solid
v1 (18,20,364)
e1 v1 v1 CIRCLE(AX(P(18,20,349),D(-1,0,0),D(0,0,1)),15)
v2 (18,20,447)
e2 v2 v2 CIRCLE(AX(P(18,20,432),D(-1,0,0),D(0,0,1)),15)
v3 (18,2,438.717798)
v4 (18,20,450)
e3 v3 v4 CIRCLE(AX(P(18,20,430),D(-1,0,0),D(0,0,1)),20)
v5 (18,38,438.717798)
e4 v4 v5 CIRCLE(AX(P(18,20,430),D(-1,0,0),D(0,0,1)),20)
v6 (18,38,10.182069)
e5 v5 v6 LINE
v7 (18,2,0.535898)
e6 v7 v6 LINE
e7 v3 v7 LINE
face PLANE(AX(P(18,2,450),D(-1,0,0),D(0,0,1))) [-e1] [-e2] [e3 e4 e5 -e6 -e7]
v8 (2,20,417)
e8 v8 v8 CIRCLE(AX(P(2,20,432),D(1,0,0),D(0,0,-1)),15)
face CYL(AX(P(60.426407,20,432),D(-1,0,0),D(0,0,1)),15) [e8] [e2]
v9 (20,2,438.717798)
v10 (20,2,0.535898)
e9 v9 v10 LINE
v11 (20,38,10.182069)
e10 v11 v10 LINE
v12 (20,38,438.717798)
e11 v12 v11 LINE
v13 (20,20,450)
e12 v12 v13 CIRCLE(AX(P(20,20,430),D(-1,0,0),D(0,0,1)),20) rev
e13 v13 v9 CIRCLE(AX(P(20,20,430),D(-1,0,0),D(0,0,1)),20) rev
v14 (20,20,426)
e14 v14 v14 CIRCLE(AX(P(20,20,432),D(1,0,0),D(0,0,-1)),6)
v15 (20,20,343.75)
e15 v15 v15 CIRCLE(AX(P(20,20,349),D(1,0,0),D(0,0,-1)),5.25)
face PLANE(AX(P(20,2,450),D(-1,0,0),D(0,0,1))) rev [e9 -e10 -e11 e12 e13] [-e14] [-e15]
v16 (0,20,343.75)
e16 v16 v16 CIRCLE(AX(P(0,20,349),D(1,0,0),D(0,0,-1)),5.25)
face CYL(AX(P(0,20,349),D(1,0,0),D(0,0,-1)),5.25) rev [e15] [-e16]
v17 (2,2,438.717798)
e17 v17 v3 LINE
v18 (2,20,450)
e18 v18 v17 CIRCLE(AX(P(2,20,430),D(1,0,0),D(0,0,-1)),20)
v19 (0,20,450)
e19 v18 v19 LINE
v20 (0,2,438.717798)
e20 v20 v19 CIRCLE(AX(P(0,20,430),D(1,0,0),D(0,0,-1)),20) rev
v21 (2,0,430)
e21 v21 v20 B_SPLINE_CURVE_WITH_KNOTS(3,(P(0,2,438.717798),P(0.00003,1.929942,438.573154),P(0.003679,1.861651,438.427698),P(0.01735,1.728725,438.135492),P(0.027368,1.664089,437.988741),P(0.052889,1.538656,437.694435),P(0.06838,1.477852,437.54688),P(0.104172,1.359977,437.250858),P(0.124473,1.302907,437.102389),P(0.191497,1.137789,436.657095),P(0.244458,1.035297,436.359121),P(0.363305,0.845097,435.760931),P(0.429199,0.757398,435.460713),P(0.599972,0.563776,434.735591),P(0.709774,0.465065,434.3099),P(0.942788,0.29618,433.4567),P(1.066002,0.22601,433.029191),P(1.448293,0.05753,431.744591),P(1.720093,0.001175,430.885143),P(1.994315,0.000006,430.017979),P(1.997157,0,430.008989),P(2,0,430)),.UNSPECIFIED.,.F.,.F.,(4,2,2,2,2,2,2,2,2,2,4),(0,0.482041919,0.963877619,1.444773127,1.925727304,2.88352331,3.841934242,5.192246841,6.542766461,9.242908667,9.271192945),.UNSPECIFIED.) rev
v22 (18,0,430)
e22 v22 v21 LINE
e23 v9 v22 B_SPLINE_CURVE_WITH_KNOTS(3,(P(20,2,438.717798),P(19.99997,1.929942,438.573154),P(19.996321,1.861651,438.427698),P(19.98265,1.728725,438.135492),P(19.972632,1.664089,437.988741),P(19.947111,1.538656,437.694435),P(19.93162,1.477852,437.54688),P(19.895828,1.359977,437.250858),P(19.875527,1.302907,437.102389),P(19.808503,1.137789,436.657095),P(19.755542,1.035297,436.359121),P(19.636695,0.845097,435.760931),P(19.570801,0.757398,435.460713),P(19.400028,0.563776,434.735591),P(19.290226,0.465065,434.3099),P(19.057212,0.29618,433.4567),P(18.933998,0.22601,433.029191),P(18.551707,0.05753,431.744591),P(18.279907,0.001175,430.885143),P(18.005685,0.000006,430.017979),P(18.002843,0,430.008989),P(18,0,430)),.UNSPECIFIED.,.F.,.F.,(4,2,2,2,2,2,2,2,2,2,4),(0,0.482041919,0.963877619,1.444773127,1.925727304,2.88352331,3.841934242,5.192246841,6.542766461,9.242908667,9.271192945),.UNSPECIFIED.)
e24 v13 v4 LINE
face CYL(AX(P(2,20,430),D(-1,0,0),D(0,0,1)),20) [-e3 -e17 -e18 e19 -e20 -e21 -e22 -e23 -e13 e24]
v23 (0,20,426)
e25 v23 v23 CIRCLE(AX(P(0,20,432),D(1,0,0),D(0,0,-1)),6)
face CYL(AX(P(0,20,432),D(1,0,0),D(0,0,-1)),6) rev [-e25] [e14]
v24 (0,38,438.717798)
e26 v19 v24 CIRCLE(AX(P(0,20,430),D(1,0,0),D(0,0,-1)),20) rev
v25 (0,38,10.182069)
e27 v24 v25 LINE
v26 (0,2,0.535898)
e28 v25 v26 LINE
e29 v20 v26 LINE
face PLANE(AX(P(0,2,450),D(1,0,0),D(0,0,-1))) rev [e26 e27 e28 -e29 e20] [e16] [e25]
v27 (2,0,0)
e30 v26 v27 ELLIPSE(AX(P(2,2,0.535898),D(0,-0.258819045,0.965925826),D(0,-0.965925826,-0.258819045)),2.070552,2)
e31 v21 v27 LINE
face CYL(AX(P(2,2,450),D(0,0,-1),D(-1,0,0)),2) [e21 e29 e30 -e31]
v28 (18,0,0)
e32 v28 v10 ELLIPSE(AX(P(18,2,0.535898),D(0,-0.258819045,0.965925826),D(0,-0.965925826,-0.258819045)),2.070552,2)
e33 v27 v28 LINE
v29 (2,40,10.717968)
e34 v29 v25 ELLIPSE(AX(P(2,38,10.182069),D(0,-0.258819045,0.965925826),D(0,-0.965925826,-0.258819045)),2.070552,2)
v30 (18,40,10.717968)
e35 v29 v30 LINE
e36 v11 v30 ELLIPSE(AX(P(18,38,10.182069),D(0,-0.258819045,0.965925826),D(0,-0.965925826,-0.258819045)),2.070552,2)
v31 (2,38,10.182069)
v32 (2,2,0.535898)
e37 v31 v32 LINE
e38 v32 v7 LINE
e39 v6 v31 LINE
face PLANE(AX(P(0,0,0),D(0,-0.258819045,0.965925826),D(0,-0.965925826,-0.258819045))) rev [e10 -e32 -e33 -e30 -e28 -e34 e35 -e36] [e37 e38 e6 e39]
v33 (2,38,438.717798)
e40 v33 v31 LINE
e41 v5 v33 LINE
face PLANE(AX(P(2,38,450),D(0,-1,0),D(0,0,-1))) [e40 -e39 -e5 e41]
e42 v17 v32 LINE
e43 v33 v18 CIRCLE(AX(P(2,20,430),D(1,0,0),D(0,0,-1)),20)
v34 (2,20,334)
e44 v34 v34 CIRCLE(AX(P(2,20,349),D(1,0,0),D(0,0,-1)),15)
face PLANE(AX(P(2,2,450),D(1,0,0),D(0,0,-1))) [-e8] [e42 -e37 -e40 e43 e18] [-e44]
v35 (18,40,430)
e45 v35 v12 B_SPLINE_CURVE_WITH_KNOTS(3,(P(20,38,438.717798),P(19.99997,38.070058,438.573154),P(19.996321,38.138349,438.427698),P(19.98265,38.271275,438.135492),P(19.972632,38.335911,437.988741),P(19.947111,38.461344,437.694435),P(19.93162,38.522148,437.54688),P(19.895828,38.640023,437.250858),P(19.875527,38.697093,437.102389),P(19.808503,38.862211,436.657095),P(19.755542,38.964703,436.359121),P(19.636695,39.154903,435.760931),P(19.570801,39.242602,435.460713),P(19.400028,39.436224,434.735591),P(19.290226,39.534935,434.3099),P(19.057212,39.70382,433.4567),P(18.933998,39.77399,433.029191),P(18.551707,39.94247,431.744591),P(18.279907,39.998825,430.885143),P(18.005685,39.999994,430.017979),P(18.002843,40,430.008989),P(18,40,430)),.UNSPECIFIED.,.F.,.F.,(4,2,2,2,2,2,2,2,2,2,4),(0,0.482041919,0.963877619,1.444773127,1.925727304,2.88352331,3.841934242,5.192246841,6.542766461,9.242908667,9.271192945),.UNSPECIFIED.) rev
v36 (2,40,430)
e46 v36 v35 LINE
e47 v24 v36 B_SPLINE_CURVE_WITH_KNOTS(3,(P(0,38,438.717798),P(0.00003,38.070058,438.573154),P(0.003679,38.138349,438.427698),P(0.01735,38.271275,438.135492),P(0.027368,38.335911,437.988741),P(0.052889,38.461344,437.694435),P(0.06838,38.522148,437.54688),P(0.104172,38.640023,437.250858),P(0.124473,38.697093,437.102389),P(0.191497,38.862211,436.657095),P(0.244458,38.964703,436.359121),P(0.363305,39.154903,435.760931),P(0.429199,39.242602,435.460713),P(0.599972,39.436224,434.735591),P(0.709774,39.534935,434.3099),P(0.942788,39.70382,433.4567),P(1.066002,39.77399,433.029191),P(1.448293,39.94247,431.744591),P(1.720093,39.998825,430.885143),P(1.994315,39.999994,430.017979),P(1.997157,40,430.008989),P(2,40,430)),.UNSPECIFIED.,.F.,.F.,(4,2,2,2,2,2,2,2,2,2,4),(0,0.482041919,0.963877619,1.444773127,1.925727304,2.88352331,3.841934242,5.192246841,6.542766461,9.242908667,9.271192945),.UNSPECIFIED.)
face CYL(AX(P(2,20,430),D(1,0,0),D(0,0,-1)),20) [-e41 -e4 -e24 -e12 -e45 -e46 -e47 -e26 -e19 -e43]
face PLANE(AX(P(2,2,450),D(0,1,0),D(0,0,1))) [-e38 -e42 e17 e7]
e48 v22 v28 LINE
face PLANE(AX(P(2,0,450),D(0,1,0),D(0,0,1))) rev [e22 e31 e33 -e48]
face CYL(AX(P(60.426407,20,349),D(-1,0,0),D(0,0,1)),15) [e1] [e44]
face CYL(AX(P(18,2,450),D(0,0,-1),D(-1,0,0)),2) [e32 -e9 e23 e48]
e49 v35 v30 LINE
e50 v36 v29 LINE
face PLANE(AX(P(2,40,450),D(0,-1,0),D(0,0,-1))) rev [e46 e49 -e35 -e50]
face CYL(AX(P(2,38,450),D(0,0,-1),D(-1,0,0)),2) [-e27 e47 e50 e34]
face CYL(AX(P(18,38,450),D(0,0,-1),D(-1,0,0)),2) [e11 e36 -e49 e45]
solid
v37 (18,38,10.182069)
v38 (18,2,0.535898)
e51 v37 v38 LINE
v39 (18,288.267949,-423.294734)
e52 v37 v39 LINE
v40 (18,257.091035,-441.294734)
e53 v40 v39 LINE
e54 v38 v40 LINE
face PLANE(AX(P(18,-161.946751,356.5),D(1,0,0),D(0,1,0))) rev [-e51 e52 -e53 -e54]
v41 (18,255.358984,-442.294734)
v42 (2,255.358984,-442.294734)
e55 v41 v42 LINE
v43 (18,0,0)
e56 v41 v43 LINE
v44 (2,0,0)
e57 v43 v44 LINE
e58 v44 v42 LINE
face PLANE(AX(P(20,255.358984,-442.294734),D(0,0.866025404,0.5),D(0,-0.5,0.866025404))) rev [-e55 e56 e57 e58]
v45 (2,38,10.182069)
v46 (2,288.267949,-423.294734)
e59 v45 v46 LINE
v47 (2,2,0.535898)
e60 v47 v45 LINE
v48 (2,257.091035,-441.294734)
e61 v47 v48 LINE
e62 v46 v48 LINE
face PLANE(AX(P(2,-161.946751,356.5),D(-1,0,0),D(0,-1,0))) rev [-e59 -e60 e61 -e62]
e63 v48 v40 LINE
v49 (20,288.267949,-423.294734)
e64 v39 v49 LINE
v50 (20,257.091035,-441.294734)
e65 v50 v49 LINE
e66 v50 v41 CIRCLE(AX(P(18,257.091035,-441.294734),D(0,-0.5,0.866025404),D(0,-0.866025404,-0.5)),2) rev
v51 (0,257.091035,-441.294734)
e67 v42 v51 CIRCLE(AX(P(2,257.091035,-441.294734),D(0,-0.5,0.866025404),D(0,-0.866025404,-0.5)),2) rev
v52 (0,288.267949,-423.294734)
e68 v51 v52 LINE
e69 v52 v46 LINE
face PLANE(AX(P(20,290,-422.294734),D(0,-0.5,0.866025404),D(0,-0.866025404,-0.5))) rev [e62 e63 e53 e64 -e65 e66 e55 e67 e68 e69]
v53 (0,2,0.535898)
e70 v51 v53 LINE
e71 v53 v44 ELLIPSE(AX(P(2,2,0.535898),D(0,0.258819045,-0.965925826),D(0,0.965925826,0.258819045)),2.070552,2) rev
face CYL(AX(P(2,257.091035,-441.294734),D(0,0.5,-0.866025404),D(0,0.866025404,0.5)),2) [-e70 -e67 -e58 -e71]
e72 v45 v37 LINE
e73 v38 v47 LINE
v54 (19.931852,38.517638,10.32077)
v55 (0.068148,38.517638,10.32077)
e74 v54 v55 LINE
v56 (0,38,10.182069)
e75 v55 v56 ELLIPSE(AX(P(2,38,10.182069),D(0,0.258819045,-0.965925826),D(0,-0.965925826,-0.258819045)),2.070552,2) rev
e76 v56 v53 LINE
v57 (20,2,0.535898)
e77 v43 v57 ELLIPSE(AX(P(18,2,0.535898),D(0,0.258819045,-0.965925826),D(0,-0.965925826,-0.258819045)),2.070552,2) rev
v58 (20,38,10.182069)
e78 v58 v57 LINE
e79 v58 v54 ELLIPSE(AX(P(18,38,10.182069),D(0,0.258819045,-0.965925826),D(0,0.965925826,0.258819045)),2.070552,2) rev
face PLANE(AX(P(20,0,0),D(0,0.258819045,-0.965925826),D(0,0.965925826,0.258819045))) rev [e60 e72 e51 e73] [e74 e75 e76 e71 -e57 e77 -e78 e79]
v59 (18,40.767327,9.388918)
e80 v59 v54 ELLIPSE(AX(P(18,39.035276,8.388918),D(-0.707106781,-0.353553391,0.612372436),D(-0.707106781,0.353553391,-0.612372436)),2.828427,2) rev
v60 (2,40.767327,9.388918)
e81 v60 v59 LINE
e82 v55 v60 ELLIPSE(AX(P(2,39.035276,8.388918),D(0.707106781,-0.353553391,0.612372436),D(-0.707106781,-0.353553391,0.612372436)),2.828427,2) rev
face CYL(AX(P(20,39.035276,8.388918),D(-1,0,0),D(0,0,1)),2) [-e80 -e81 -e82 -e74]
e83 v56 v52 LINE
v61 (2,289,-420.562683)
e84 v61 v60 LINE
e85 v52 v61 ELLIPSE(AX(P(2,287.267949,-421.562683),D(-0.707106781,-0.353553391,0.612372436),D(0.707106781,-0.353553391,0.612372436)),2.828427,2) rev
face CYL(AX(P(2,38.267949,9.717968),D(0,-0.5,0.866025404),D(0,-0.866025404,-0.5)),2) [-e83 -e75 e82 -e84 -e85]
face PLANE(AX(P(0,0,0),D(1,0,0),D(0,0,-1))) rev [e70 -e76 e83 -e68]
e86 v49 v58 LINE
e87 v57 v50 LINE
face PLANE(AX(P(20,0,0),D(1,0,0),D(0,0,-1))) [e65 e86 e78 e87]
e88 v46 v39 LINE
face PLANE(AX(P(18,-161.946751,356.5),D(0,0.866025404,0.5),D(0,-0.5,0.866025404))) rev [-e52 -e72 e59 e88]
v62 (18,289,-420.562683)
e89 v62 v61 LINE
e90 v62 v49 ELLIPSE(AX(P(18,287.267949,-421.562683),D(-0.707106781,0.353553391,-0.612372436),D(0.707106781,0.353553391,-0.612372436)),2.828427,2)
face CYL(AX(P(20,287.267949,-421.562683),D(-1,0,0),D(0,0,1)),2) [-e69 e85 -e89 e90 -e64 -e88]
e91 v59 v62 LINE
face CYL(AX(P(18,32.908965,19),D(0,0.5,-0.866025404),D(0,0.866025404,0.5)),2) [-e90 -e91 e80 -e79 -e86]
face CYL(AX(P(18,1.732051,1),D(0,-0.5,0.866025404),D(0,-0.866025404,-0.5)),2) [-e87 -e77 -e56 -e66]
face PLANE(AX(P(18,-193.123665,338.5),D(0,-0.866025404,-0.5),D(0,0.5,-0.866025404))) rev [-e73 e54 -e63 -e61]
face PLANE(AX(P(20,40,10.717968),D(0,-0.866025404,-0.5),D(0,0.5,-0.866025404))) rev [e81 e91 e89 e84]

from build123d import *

# Parameters (mm, degrees)
SCHIZZO1_W                    = 16
SCHIZZO1_H                    = 36
ESTRUSIONE_SOTTILE1_DEPTH     = 450
SCHIZZO2_R                    = 15
ESTRUSIONE_ESTRUSIONE1_DEPTH  = 16
RIPETIZIONE_A_L1_COUNT        = 2
RIPETIZIONE_A_L1_PITCH        = 83
SCHIZZO3_R                    = 6
SCHIZZO3_R_2                  = 5.25
TAGLIO_ESTRUSIONE1_DEPTH      = 453.216762184
TAGLIO_ESTRUSIONE2_DEPTH      = 453.216762184
RACCORDO1_R                   = 20
ESTRUSIONE_ESTRUSIONE2_DEPTH  = 10
RACCORDO2_R                   = 2
TAGLIO_ESTRUSIONE3_DEPTH      = 929.330815786
TAGLIO_ESTRUSIONE3_DEPTH_BACK = 929.330815786
SCHIZZO7_W                    = 16
SCHIZZO7_H                    = 36


with BuildPart() as part:
    # Schizzo1 → Estrusione-Sottile1 (new body)
    with BuildSketch(Plane.XY):
        with BuildLine():
            Line((0, 38), (0, 2))
            ThreePointArc((0, 2), (0.585786438, 0.585786438), (2, 0))
            Line((2, 0), (18, 0))
            ThreePointArc((18, 0), (19.414213562, 0.585786438), (20, 2))
            Line((20, 2), (20, 38))
            ThreePointArc((20, 38), (19.414213562, 39.414213562), (18, 40))
            Line((18, 40), (2, 40))
            ThreePointArc((2, 40), (0.585786438, 39.414213562), (0, 38))
        make_face()
        with Locations((10, 20)):
            Rectangle(SCHIZZO1_W, SCHIZZO1_H, mode=Mode.SUBTRACT)
    extrude(amount=ESTRUSIONE_SOTTILE1_DEPTH)

    # Schizzo2 → Estrusione-Estrusione1 (add)
    with BuildSketch(Plane(origin=(2, 0, 0), x_dir=(0, 0, -1), z_dir=(1, 0, 0))):
        with Locations(Location((-432, 20, 0), (0, 0, 180))):
            Circle(SCHIZZO2_R)
    estrusione_estrusione1 = extrude(amount=ESTRUSIONE_ESTRUSIONE1_DEPTH)

    # Ripetizione a L1: Estrusione-Estrusione1 ×2
    with Locations(*[(0, 0, -i * RIPETIZIONE_A_L1_PITCH) for i in range(1, RIPETIZIONE_A_L1_COUNT)]):
        add(estrusione_estrusione1)

    # Schizzo3 → Taglio-Estrusione1 (cut, through all)
    with BuildSketch(Plane(origin=(20, 0, 0), x_dir=(0, 0, -1), z_dir=(1, 0, 0))):
        with Locations((-432, 20)):
            Circle(SCHIZZO3_R)
        with Locations((-349, 20)):
            Circle(SCHIZZO3_R_2)
    extrude(amount=-TAGLIO_ESTRUSIONE1_DEPTH, mode=Mode.SUBTRACT)

    # Schizzo4 → Taglio-Estrusione2 (cut, through all)
    with BuildSketch(Plane(origin=(20, 0, 0), x_dir=(0, 0, -1), z_dir=(1, 0, 0))):
        Polygon((0, 0), (-10.717967697, 40), (0, 40), align=None)
    extrude(amount=-TAGLIO_ESTRUSIONE2_DEPTH, mode=Mode.SUBTRACT)

    # Raccordo1
    # the kernel refuses this fillet: 20 mm, written as the material it takes off along each edge
    with BuildSketch(Plane(origin=(-48, 0, 450), x_dir=(0, 1, 0), z_dir=(1, 0, 0)), Plane(origin=(68, 40, 450), x_dir=(0, -1, 0), z_dir=(-1, 0, 0))) as raccordo1_piece_1:
        with BuildLine():
            CenterArc((RACCORDO1_R, -RACCORDO1_R), RACCORDO1_R, 90, 90)
            Line((0, -RACCORDO1_R), (0, 0))
            Line((0, 0), (RACCORDO1_R, 0))
        make_face()
    extrude(amount=116, mode=Mode.SUBTRACT)


with BuildPart() as body_2:
    # Schizzo5 → Estrusione-Estrusione2 (new, symmetric)
    with BuildSketch(Plane(origin=(10, 0, 0), x_dir=(0, 0, -1), z_dir=(1, 0, 0))):
        Polygon((422.294734195, 290), (442.294734195, 255.358983849), (0, 0), (-10.717967697, 40), align=None)
    extrude(amount=ESTRUSIONE_ESTRUSIONE2_DEPTH, both=True)

    # Raccordo2
    raccordo2_edges = [body_2.edges().sort_by_distance(p)[0] for p in [
        (20, 165, -205.788383249),
        (20, 127.679491924, -221.147367097),
        (0, 165, -205.788383249),
        (0, 127.679491924, -221.147367097),
        (10, 40, 10.717967697),
        (10, 290, -422.294734195),
    ]]
    fillet(raccordo2_edges, radius=RACCORDO2_R)

    # Schizzo7 → Taglio-Estrusione3 (cut, two sides: drawn at the far end of the back side and taken through both)
    with BuildSketch(Plane(origin=(0, 255.358983849, -442.294734195), x_dir=(-1, 0, 0), z_dir=(0, 0.4999999999999891, -0.8660254037844448)).offset(-TAGLIO_ESTRUSIONE3_DEPTH_BACK)):
        with Locations((-10, 20)):
            Rectangle(SCHIZZO7_W, SCHIZZO7_H)
    extrude(amount=TAGLIO_ESTRUSIONE3_DEPTH + TAGLIO_ESTRUSIONE3_DEPTH_BACK, mode=Mode.SUBTRACT)


solid = Compound([part.part, body_2.part])
